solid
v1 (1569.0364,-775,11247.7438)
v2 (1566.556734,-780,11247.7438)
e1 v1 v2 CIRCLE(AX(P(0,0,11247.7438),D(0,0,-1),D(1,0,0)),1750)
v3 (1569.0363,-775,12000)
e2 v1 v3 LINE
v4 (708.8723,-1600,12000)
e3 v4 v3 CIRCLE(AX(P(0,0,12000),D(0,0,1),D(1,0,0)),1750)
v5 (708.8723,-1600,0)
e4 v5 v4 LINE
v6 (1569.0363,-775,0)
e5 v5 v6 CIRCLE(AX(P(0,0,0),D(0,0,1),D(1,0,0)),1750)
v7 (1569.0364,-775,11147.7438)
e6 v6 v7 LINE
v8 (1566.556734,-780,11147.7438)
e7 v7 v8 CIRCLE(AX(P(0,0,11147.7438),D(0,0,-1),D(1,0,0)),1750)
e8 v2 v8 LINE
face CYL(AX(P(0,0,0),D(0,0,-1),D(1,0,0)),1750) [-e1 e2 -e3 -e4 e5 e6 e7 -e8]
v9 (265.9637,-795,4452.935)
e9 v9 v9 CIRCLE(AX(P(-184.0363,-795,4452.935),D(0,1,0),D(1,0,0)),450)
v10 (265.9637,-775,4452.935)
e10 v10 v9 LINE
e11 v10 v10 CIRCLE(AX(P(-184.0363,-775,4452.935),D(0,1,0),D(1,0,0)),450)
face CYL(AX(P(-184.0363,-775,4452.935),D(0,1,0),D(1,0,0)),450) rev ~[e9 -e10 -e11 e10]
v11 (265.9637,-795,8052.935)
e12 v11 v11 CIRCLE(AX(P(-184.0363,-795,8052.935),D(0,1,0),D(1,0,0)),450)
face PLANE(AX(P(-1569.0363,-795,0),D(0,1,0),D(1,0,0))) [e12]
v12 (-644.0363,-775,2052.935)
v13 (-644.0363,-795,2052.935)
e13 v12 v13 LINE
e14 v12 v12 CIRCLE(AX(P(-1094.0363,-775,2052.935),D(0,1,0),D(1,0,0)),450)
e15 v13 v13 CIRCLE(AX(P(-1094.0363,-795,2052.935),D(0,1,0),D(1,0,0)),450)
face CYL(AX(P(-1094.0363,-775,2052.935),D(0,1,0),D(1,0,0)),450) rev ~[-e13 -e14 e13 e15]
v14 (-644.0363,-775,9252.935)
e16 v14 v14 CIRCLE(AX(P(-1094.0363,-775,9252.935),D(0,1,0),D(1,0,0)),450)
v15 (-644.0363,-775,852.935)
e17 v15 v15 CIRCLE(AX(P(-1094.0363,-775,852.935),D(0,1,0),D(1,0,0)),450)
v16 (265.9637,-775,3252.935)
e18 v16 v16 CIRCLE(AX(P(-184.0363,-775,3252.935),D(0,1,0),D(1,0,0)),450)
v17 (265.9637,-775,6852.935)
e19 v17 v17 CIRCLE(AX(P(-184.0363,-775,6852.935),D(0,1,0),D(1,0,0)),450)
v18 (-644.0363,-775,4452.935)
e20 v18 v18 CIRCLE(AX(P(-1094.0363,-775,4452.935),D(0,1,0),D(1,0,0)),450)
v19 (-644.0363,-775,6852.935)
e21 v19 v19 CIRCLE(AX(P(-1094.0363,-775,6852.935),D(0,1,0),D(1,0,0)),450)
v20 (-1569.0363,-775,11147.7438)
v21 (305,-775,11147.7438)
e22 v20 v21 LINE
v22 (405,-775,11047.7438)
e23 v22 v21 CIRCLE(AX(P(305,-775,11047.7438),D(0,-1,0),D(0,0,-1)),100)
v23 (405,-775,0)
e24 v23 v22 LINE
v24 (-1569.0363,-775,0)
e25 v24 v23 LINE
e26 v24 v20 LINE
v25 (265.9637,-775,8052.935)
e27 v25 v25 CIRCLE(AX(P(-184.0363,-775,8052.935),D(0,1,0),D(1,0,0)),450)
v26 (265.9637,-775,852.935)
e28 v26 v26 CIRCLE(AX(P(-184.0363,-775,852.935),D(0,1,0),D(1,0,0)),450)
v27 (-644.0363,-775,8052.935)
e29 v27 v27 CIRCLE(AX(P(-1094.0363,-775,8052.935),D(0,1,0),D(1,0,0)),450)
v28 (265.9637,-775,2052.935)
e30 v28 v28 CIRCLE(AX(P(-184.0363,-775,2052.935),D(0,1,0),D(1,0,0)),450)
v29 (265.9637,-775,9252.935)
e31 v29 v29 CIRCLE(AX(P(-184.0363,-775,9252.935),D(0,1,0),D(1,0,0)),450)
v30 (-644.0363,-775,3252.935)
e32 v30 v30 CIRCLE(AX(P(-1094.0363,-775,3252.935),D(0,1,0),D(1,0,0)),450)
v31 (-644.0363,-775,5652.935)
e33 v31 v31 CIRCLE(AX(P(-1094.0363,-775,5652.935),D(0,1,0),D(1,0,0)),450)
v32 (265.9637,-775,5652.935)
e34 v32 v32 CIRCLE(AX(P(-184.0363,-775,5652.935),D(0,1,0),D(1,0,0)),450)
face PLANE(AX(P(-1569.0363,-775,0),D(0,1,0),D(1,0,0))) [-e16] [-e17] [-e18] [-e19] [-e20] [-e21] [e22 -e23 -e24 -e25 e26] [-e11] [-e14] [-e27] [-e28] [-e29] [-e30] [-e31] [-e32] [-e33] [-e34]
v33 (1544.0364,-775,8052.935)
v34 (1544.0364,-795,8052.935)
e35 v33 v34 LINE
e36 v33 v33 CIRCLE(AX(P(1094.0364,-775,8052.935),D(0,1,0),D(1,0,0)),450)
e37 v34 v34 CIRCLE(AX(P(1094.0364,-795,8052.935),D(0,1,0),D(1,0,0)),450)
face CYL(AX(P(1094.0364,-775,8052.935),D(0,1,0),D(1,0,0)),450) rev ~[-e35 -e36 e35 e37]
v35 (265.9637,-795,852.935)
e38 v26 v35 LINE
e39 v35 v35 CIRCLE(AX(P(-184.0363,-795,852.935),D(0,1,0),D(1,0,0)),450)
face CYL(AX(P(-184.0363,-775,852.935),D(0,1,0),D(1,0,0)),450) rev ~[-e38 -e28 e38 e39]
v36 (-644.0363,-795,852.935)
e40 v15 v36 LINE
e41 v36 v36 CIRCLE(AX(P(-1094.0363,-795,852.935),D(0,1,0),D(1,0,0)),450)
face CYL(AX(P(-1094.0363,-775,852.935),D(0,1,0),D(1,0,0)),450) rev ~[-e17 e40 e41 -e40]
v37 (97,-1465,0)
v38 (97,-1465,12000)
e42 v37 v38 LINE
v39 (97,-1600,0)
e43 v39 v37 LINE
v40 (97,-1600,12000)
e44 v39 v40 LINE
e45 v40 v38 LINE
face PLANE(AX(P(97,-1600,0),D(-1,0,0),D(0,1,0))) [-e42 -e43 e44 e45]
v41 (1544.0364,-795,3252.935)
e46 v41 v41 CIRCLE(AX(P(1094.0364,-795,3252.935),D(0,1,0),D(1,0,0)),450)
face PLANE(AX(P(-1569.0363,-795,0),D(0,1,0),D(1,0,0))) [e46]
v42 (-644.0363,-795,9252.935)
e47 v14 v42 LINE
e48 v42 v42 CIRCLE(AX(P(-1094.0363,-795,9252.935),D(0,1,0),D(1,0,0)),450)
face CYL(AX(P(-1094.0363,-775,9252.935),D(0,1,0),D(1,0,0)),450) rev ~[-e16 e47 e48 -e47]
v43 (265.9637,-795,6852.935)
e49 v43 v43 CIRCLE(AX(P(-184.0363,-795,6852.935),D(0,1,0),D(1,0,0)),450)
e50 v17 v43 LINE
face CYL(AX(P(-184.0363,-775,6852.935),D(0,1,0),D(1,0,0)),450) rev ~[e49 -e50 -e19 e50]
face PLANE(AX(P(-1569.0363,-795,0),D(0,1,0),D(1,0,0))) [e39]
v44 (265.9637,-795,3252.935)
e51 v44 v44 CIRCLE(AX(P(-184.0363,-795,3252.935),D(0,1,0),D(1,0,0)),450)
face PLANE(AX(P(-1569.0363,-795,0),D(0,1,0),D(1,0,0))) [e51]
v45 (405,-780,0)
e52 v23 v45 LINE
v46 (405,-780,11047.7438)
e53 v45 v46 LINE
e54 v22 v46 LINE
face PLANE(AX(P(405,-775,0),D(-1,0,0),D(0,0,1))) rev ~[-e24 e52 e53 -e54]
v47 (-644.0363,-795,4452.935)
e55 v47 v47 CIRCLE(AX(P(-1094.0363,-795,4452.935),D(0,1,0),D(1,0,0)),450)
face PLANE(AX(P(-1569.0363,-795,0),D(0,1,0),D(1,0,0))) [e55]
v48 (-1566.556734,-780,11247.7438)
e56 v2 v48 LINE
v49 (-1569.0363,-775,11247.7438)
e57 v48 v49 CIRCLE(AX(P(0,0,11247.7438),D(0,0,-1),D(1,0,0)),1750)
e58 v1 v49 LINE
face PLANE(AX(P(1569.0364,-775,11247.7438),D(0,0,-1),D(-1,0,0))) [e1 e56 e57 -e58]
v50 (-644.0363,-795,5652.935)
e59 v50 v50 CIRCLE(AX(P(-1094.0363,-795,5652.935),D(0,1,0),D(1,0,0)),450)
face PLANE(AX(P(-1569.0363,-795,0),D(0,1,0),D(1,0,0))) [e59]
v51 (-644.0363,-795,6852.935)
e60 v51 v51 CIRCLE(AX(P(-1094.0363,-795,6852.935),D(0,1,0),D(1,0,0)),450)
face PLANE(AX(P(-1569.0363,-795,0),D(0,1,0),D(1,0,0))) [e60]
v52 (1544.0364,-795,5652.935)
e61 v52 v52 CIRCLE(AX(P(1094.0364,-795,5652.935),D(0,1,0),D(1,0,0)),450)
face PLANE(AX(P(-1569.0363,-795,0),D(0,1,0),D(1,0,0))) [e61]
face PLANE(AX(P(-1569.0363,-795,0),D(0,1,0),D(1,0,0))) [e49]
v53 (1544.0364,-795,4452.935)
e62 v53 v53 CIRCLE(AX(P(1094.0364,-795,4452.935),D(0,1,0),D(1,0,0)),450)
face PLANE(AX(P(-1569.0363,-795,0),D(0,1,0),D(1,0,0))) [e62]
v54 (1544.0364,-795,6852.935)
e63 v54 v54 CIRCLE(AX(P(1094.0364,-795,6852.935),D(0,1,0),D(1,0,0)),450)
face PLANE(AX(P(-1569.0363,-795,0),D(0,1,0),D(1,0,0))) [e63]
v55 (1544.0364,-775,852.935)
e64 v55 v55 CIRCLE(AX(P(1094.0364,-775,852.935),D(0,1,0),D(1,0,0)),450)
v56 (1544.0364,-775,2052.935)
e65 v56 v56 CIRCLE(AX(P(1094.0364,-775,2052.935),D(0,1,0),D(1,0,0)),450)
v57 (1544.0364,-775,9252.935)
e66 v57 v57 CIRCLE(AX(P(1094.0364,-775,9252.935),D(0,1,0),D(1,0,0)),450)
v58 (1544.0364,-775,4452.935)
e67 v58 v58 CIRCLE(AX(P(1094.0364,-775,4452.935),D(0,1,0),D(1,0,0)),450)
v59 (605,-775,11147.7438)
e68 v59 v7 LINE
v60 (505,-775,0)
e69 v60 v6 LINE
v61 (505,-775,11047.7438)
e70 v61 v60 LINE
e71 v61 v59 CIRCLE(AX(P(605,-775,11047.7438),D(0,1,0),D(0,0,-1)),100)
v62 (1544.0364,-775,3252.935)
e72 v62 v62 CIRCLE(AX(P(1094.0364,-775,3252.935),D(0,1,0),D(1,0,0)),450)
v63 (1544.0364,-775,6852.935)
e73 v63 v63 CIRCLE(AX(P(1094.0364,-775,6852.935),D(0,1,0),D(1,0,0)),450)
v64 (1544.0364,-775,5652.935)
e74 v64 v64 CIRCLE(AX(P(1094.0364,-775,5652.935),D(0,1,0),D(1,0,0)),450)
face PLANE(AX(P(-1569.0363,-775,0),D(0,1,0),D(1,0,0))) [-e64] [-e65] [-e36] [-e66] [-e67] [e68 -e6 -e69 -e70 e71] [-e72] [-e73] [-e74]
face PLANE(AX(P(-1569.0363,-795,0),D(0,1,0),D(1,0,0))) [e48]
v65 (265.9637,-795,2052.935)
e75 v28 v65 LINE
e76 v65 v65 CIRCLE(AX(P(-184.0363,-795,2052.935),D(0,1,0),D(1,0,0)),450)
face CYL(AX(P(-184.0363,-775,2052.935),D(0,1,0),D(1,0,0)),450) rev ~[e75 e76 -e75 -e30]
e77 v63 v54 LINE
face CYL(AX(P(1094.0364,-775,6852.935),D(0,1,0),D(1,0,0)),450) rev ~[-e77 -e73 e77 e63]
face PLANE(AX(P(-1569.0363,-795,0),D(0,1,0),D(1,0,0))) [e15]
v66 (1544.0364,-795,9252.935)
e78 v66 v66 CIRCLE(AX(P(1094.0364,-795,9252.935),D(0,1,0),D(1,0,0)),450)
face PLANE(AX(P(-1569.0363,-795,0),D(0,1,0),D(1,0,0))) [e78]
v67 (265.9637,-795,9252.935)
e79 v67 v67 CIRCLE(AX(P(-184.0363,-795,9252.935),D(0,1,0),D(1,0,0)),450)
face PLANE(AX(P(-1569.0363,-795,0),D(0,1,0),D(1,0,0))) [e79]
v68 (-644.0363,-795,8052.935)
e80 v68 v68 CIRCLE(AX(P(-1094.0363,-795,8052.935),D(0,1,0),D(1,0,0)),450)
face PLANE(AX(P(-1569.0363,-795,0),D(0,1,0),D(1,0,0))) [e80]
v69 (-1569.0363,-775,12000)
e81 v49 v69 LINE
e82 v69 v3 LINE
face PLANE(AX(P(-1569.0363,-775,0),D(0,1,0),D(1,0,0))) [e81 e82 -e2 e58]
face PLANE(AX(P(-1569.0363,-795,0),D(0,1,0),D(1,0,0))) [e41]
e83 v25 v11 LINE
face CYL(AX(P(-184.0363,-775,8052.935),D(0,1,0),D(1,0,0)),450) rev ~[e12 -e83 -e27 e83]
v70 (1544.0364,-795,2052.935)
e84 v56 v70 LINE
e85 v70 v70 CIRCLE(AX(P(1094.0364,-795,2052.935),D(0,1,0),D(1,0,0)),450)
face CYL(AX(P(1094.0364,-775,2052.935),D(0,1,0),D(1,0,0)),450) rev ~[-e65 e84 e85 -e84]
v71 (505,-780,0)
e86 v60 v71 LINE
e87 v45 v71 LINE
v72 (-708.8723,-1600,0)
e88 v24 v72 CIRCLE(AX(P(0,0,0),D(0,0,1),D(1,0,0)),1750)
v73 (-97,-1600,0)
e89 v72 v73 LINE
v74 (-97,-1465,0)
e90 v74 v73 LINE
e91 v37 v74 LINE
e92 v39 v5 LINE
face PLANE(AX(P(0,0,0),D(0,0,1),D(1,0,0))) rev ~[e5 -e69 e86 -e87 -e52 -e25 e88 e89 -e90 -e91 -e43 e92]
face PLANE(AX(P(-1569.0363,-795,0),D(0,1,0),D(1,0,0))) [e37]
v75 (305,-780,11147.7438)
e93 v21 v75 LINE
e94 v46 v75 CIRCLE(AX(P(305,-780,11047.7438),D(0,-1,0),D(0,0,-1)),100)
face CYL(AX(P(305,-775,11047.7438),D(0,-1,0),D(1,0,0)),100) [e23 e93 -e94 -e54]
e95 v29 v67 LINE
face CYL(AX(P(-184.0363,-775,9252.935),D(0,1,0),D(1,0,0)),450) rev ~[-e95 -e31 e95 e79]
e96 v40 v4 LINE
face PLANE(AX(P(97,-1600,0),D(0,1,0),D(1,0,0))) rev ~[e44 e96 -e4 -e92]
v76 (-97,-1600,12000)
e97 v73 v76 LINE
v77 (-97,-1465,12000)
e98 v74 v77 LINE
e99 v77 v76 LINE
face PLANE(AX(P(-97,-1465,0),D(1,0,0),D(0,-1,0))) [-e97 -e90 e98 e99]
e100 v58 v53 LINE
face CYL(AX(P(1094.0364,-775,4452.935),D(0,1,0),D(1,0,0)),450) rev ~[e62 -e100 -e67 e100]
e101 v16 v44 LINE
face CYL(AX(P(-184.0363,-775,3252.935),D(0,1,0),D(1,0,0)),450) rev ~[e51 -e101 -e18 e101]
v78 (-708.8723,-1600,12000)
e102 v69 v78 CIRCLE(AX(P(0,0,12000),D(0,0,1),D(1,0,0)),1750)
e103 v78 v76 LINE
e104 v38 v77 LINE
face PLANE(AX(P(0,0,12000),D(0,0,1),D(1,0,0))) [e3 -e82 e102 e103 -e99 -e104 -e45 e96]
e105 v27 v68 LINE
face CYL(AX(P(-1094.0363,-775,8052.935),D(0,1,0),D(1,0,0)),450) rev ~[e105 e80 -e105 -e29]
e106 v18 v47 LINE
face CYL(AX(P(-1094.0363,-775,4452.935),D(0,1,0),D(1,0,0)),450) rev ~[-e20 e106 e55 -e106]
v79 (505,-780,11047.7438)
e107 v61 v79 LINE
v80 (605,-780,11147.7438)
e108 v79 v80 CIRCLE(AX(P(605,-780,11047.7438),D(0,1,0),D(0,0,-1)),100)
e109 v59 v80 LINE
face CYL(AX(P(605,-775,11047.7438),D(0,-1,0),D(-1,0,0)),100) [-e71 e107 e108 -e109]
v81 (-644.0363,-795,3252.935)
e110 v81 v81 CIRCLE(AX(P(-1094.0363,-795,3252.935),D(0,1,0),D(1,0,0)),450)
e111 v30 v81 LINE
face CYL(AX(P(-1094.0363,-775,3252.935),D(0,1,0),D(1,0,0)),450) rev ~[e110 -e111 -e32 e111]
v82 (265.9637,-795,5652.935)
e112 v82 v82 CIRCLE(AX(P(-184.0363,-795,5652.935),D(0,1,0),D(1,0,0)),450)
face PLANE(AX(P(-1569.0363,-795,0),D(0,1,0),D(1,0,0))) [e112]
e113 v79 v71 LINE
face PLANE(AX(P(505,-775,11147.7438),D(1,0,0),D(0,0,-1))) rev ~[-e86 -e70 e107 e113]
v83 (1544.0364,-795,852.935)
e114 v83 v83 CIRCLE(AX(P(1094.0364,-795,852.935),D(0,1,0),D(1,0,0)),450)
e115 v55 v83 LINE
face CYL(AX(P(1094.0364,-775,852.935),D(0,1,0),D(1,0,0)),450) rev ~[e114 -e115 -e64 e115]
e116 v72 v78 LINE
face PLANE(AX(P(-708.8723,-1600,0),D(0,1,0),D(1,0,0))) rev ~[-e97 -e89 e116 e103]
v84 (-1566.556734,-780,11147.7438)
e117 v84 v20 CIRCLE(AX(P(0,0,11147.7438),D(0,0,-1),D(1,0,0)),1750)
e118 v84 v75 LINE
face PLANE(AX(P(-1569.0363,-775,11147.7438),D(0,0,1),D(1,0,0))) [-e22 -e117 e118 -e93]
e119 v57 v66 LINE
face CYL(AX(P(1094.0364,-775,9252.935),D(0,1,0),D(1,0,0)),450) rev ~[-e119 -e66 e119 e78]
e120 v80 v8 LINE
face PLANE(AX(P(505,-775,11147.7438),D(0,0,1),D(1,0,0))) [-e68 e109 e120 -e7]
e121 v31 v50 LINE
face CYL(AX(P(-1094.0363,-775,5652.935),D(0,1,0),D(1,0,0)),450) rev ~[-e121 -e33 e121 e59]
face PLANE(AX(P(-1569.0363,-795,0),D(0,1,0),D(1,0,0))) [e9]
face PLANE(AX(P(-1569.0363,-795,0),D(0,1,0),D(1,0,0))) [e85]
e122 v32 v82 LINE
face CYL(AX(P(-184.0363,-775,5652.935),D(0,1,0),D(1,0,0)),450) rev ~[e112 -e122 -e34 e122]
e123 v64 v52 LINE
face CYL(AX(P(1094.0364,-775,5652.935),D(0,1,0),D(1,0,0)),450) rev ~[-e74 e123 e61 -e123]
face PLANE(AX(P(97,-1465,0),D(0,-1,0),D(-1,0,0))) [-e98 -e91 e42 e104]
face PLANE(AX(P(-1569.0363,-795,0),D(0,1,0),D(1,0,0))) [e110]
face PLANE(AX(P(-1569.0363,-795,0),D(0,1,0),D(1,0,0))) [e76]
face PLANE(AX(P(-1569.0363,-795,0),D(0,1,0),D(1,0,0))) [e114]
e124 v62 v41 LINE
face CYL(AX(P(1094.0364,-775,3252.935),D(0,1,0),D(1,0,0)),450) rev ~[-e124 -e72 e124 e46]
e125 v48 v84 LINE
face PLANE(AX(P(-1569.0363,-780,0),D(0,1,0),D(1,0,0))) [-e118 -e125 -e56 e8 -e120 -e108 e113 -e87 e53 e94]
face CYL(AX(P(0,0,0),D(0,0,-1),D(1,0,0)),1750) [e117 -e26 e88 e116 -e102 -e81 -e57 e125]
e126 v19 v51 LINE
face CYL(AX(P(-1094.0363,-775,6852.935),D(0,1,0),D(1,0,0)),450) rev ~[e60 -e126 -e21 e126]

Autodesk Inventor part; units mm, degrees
ref_plane "YZ Plane" through (0, 0, 0) normal (1, 0, 0) x (0, 1, 0)
ref_plane "XZ Plane" through (0, 0, 0) normal (0, 1, 0) x (-1, 0, 0)
ref_plane "XY Plane" through (0, 0, 0) normal (0, 0, 1) x (1, 0, 0)
sketch "Sketch1" plane through (0, 0, 0) normal (0, 0, 1) x (1, 0, 0)
  circle A0 centre (0, 0) radius 1750
  line L0 (-1569.0363, -775) -> (1569.0363, -775)
  line L1 (-64, -1498) -> (64, -1498)
  line L2 (64, -1498) -> (64, -1600)
  line L3 (64, -1600) -> (-64, -1600)
  line L4 (-64, -1600) -> (-64, -1498)
  line L5 (-64, -1498) -> (64, -1600) construction
  line L6 (64, -1498) -> (-64, -1600) construction
  line L7 (97, -1633) -> (97, -1465)
  line L8 (97, -1465) -> (-97, -1465)
  line L9 (-97, -1465) -> (-97, -1633)
  line L10 (-97, -1633) -> (97, -1465) construction
  line L11 (97, -1633) -> (-97, -1465) construction
  line L12 (-708.8723, -1600) -> (708.8723, -1600)
  point P0 (0, -1549)
  point P1 (0, -1549)
  point P2 (97, -1600)
  point P3 (-97, -1600)
  dimension "d10" = 3500
  dimension "d12" = 33
  dimension "d13" = 33
  dimension "d14" = 102
  dimension "d15" = 128
  dimension "d16" = 1600
  dimension "d17" = 825
extrude "Extrusion1" add sketch "Sketch1" along normal blind 12000 contours L0 A0 L12 L7 L8 L9
sketch "Sketch2" plane through (-1569.0363, -775, 0) normal (0, 1, 0) x (1, 0, 0)
  circle A0 centre (2663.0727, -9252.935) radius 450
  circle A1 centre (1385, -9252.935) radius 450
  circle A2 centre (475, -9252.935) radius 450
  line L0 (3138.0727, 0) -> (3138.0727, -12000) projected
  line L1 (0, 0) -> (0, -12000) projected
  circle A3 centre (475, -8052.935) radius 450
  circle A4 centre (1385, -8052.935) radius 450
  circle A5 centre (2663.0727, -8052.935) radius 450
  circle A6 centre (475, -6852.935) radius 450
  circle A7 centre (1385, -6852.935) radius 450
  circle A8 centre (2663.0727, -6852.935) radius 450
  circle A9 centre (475, -5652.935) radius 450
  circle A10 centre (1385, -5652.935) radius 450
  circle A11 centre (2663.0727, -5652.935) radius 450
  circle A12 centre (475, -4452.935) radius 450
  circle A13 centre (1385, -4452.935) radius 450
  circle A14 centre (2663.0727, -4452.935) radius 450
  circle A15 centre (475, -3252.935) radius 450
  circle A16 centre (1385, -3252.935) radius 450
  circle A17 centre (2663.0727, -3252.935) radius 450
  circle A18 centre (475, -2052.935) radius 450
  circle A19 centre (1385, -2052.935) radius 450
  circle A20 centre (2663.0727, -2052.935) radius 450
  circle A21 centre (475, -852.935) radius 450
  circle A22 centre (1385, -852.935) radius 450
  circle A23 centre (2663.0727, -852.935) radius 450
  point P0 (1569.0363, 0)
  dimension "d20" = 900
  dimension "d21" = 910
  dimension "d24" = 1200
  dimension "d31" = 475
  dimension "d32" = 475
extrude "Extrusion2" cut sketch "Sketch2" against normal blind 20
sketch "Sketch3" plane through (-1569.0363, -775, 0) normal (0, 1, 0) x (1, 0, 0)
  line L0 (1666.0363, 0) -> (2277.9087, 0) projected
  line L1 (2074.0363, 0) -> (1974.0363, 0)
  line L2 (1974.0363, 0) -> (1974.0363, -11147.7438)
  line L3 (1974.0363, -11147.7438) -> (2074.0363, -11147.7438)
  line L4 (2074.0363, -11147.7438) -> (2074.0363, 0)
  line L5 (0, 0) -> (0, -12000) projected
  line L6 (3138.0727, -11247.7438) -> (0, -11247.7438)
  line L7 (0, -11247.7438) -> (0, -11147.7438)
  line L8 (0, -11147.7438) -> (3138.0727, -11147.7438)
  line L9 (3138.0727, -11147.7438) -> (3138.0727, -11247.7438)
  line L10 (3138.0727, 0) -> (3138.0727, -12000) projected
  circle A0 centre (2663.0727, -9252.935) radius 450 projected
  circle A1 centre (2024.0363, -9581.3845) radius 268.503 construction
  circle A2 centre (1385, -9252.935) radius 450 projected
  line L11 (2024.0363, -9581.3845) -> (1974.0363, -9581.3845) construction
  line L12 (2024.0363, -9581.3845) -> (2074.0363, -9581.3845) construction
  point P0 (1569.0363, 0)
  dimension "d33" = 100
extrude "Extrusion3" cut sketch "Sketch3" against normal blind 5 contours L0 L4 L3 L2 | L3 L8 L9 L6 L5
fillet "Fillet1" radius 100 2 edges at (405, -777.5, 11147.7438) (505, -777.5, 11147.7438)
properties part number "Floor"
